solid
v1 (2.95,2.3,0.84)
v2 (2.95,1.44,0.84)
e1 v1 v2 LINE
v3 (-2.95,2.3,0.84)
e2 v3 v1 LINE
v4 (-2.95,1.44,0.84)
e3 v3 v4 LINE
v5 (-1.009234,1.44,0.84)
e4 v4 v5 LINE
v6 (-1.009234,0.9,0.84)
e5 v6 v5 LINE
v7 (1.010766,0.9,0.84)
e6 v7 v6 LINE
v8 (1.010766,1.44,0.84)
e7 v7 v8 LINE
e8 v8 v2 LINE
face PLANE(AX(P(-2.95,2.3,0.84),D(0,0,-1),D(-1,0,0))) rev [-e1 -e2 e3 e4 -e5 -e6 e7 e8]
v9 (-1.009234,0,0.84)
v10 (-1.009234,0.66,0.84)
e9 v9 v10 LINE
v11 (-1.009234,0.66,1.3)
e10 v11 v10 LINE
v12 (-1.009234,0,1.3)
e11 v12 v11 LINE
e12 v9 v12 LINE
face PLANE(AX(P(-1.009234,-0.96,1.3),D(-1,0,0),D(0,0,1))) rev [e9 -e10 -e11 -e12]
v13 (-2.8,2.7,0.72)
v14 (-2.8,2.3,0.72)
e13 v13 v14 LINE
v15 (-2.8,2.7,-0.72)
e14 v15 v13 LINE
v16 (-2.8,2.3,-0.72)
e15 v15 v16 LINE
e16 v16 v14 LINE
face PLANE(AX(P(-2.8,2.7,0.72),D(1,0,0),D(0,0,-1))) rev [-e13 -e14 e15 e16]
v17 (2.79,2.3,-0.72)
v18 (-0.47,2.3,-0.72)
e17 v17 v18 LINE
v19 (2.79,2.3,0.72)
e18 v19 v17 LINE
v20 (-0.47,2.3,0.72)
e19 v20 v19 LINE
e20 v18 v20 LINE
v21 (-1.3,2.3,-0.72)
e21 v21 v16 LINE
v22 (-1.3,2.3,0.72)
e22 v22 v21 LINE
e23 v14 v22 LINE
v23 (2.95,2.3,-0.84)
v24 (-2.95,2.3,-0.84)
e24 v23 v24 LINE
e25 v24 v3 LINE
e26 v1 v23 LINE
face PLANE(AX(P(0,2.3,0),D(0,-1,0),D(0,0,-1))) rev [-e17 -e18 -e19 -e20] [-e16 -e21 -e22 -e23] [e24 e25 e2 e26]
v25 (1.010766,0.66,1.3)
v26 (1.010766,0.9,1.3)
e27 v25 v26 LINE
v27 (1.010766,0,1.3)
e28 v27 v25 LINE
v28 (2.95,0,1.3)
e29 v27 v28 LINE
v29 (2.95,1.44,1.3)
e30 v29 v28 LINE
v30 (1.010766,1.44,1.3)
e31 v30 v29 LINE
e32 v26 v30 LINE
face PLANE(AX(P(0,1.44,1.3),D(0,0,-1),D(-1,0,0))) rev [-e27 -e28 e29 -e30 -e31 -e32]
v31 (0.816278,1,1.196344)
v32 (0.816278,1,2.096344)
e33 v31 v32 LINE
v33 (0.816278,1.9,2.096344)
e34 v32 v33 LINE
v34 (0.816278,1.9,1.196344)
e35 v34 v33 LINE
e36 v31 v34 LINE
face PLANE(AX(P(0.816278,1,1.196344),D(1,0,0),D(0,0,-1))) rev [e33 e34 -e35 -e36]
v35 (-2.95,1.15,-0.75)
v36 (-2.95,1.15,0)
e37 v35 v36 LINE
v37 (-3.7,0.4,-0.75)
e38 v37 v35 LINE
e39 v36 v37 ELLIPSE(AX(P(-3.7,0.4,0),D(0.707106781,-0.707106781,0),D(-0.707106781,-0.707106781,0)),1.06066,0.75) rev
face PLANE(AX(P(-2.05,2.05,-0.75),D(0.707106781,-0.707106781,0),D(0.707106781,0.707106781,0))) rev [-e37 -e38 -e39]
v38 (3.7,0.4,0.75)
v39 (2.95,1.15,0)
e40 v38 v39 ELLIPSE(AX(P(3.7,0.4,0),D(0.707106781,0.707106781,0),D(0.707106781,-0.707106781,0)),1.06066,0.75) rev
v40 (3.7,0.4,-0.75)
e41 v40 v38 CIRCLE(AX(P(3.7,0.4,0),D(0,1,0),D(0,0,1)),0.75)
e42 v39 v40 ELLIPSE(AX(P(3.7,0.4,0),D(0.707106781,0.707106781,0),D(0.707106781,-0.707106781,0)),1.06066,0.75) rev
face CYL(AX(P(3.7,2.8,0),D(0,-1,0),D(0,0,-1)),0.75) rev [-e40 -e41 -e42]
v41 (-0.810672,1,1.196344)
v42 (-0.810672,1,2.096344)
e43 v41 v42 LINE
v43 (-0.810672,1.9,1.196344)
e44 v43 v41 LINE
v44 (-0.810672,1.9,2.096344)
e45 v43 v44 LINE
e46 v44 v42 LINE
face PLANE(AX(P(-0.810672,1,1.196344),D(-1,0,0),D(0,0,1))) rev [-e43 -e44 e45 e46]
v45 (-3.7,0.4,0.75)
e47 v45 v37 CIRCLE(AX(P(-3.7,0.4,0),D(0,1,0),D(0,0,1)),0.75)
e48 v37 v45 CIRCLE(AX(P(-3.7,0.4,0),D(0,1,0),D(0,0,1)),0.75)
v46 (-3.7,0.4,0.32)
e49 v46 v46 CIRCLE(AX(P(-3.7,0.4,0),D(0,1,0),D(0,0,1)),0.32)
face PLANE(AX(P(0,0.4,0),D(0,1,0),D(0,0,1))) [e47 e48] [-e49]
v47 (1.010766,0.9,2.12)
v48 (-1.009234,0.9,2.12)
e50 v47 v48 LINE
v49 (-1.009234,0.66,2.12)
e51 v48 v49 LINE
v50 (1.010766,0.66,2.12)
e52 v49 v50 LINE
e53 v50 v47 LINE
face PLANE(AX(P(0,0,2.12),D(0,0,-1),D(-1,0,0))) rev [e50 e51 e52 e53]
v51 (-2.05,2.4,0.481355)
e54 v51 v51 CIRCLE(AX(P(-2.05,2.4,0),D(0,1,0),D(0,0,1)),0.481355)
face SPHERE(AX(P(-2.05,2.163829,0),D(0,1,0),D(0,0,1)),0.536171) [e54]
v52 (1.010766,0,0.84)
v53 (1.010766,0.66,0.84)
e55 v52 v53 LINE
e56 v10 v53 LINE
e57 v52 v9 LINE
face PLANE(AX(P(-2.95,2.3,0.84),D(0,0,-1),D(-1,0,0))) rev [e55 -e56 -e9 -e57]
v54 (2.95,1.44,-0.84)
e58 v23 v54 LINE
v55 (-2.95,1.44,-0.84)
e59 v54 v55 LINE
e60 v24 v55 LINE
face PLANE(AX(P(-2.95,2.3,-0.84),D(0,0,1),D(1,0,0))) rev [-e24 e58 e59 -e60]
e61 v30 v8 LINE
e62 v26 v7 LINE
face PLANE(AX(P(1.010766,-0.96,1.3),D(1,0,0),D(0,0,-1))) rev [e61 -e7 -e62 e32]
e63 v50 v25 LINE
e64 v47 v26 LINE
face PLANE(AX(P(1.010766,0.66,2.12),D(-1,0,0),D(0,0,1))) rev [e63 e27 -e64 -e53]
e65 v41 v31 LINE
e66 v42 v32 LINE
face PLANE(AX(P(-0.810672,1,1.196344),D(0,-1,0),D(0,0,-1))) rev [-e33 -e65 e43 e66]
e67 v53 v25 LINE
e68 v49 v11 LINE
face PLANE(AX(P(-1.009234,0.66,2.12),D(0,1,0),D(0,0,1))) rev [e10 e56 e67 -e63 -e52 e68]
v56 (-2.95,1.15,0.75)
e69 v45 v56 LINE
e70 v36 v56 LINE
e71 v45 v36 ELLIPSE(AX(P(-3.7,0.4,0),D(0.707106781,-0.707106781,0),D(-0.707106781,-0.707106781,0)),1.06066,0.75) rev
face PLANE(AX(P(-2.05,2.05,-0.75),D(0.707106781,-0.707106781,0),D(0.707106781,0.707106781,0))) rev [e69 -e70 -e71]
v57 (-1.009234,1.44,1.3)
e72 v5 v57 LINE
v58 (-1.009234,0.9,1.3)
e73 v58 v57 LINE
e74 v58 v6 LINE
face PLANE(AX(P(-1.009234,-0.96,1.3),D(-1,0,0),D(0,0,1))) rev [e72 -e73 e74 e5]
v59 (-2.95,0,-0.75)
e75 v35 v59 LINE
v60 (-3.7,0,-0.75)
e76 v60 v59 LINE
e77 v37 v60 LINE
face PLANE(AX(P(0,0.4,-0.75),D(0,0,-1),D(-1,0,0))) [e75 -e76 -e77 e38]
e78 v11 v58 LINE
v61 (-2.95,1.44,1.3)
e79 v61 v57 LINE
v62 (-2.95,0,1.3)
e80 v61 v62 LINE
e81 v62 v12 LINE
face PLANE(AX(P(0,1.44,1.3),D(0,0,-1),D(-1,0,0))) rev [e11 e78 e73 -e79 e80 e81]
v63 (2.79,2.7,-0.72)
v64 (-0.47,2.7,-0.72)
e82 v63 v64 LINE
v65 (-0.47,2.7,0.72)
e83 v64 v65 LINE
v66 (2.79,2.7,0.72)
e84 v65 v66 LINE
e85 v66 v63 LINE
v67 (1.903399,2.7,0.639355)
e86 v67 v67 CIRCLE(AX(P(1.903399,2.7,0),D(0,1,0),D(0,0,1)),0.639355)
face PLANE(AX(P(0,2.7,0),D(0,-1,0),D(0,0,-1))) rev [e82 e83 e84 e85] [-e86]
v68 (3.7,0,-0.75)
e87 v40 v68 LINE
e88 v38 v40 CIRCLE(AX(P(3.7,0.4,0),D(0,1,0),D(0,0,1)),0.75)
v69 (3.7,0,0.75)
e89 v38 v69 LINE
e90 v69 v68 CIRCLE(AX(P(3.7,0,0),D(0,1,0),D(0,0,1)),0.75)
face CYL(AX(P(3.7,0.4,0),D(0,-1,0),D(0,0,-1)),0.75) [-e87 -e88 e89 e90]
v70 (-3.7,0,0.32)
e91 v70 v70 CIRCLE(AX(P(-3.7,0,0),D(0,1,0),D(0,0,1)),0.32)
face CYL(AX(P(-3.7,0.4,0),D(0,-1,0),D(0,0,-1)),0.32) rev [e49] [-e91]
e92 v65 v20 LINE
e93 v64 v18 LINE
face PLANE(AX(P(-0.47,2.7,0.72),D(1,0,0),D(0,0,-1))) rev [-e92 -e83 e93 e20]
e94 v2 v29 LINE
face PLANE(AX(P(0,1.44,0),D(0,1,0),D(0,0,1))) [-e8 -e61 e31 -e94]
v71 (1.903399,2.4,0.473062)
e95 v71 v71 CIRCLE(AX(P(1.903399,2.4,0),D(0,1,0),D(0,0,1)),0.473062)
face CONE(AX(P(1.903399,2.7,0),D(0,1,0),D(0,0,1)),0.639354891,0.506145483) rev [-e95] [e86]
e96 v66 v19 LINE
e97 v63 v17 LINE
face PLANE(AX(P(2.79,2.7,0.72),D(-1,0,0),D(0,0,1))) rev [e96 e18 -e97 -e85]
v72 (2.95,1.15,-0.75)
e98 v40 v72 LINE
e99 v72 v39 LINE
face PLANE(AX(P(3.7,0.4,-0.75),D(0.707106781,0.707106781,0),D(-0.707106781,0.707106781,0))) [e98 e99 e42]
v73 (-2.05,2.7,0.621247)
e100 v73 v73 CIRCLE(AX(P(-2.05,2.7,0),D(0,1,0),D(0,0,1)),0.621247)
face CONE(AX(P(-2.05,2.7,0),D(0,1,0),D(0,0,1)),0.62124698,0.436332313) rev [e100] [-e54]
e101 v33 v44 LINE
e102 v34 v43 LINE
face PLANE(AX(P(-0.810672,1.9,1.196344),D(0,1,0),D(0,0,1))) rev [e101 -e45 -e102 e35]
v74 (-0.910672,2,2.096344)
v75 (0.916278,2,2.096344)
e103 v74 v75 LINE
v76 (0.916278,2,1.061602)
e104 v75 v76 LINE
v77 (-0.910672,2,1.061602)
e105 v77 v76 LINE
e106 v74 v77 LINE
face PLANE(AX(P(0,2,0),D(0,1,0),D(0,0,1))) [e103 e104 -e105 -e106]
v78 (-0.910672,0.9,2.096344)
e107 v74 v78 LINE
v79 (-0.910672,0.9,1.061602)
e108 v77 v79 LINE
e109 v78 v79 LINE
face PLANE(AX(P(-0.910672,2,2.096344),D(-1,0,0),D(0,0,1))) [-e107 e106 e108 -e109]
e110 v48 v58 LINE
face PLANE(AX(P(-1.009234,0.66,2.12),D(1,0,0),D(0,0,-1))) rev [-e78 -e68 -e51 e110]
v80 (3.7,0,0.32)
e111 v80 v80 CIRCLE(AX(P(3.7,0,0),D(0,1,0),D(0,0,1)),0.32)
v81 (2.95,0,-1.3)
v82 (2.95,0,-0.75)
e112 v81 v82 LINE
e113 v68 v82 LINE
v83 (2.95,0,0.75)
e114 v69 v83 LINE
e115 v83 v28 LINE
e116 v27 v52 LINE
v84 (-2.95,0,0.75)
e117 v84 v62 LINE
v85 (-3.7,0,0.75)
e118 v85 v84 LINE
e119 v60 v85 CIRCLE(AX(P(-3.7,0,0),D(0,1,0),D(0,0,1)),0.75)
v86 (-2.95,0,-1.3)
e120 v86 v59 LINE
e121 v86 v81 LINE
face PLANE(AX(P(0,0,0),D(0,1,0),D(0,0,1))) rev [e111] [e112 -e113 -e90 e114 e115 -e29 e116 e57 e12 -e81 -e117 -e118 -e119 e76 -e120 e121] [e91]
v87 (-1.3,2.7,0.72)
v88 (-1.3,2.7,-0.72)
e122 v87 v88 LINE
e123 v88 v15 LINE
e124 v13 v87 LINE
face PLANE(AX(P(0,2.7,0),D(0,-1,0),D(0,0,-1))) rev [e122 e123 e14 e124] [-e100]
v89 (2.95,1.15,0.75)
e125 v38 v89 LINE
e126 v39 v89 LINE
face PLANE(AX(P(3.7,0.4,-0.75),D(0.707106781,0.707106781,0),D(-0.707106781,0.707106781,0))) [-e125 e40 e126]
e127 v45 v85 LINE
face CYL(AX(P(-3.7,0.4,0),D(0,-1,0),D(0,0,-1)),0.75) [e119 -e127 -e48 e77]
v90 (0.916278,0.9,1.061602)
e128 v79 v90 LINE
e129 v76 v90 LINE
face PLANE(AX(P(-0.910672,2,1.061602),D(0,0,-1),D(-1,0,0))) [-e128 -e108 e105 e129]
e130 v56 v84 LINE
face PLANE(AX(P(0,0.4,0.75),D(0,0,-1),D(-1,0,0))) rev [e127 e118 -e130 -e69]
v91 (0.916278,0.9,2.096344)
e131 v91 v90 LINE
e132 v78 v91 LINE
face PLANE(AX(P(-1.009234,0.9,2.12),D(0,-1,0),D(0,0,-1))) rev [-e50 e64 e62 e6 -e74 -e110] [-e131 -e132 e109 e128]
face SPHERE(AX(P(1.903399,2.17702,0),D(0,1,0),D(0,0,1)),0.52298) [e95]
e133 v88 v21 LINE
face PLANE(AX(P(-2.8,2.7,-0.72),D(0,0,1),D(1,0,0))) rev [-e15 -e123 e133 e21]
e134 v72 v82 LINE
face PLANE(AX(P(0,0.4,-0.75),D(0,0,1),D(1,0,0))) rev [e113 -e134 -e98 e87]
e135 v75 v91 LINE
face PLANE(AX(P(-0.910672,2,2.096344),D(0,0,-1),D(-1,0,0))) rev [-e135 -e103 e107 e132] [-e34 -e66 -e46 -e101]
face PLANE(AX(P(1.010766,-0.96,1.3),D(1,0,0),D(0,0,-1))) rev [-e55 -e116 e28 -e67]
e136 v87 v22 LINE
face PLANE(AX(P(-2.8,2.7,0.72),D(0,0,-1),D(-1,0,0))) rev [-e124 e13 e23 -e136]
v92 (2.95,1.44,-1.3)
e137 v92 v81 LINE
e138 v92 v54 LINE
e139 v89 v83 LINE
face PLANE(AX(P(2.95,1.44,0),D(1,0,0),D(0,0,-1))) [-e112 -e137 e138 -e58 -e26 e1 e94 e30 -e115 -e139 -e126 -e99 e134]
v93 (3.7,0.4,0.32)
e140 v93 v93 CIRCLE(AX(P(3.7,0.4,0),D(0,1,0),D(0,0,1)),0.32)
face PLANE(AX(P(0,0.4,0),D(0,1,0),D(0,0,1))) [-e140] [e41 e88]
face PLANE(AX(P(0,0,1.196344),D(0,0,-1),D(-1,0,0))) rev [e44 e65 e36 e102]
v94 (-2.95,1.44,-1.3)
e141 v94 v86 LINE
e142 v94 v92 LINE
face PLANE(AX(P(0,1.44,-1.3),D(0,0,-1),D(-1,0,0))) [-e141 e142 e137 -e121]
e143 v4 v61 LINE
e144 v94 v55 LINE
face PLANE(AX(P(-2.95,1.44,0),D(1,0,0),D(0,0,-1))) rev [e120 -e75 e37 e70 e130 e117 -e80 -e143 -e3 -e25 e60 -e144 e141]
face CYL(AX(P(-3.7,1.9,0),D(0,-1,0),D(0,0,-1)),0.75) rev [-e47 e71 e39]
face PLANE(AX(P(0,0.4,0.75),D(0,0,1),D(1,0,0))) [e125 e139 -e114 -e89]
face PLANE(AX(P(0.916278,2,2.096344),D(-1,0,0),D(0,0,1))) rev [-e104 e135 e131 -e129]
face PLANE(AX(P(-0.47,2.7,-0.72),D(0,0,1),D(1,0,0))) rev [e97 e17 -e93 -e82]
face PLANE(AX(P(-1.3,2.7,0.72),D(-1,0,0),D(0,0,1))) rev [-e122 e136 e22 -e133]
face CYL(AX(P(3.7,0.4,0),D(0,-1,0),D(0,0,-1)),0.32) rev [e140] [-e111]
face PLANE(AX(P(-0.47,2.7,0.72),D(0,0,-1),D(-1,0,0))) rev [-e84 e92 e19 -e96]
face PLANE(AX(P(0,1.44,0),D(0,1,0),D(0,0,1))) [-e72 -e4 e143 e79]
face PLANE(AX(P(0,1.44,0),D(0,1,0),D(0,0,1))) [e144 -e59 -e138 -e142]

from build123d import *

# Parameters (mm, degrees)
BOSS_EXTRUDE1_DEPTH   = 7.2
SKETCH1_3_R           = 3.75
SKETCH1_3_R_2         = 1.6
BOSS_EXTRUDE2_DEPTH   = 2
BOSS_EXTRUDE2_2_DEPTH = 2
BOSS_EXTRUDE3_DEPTH   = 2
BOSS_EXTRUDE4_DEPTH   = 7.5
SKETCH3_R             = 3.75
CUT_EXTRUDE6_DEPTH    = 12
BOSS_EXTRUDE5_DEPTH   = 7.5
SKETCH5_R             = 3.75
CUT_EXTRUDE7_DEPTH    = 7.5
SKETCH6_W             = 29.5
SKETCH6_H             = 8.4
BOSS_EXTRUDE6_DEPTH   = 4.3
SKETCH7_W             = 7.5
SKETCH7_H             = 7.2
SKETCH7_W_2           = 16.3
BOSS_EXTRUDE7_DEPTH   = 2
SKETCH8_W             = 10.1
SKETCH8_H             = 2.3
CUT_EXTRUDE8_DEPTH    = 12
SKETCH9_W             = 10.1
SKETCH9_H             = 1.2
BOSS_EXTRUDE8_DEPTH   = 6.4
SKETCH11_W            = 9.1347476
SKETCH11_H            = 5.173710516
BOSS_EXTRUDE11_DEPTH  = 5.5
SKETCH12_R            = 3.106234899
CUT_EXTRUDE10_DEPTH   = 1.5
CUT_EXTRUDE10_DRAFT   = -25
SKETCH13_R            = 3.196774454
CUT_EXTRUDE11_DEPTH   = 1.5
CUT_EXTRUDE11_DRAFT   = -29
SKETCH14_W            = 8.1347476
SKETCH14_H            = 4.5
CUT_EXTRUDE12_DEPTH   = 4.5
SCALE1_SCALE          = 0.2


# Read off the part's stored shape, not the designer's step: Dome1, Dome2
with BuildPart() as part:
    # Sketch1 → Boss-Extrude1 (new body)
    with BuildSketch(Plane(origin=(0, 0, 0), x_dir=(1, 0, 0), z_dir=(0, 1, 0))):
        Polygon((14.75, 0), (-14.75, 0), (-14.75, -3.75), (-14.75, -6.5), (14.75, -6.5), (14.75, -3.75), align=None)
        Polygon((-14.75, 3.75), (-14.75, 0), (14.75, 0), (14.75, 3.75), (14.75, 6.5), (-14.75, 6.5), align=None)
    extrude(amount=BOSS_EXTRUDE1_DEPTH)



with BuildPart() as body_2:
    # Sketch1<3> → Boss-Extrude2 (new body)
    with BuildSketch(Plane(origin=(0, 0, 0), x_dir=(1, 0, 0), z_dir=(0, 1, 0))):
        with Locations(Location((-18.5, 0, 0), (0, 0, 270))):
            Circle(SKETCH1_3_R)
        with Locations(Location((-18.5, 0, 0), (0, 0, 270))):
            Circle(SKETCH1_3_R_2, mode=Mode.SUBTRACT)
    extrude(amount=BOSS_EXTRUDE2_DEPTH)


with BuildPart() as body_3:
    # Sketch1<3> → Boss-Extrude2 2 (new body)
    with BuildSketch(Plane(origin=(0, 0, 0), x_dir=(1, 0, 0), z_dir=(0, 1, 0))):
        with Locations(Location((18.5, 0, 0), (0, 0, 270))):
            Circle(SKETCH1_3_R)
        with Locations(Location((18.5, 0, 0), (0, 0, 270))):
            Circle(SKETCH1_3_R_2, mode=Mode.SUBTRACT)
    extrude(amount=BOSS_EXTRUDE2_2_DEPTH)


with BuildPart() as part_1:
    add(part.part)

    add(body_2.part)  # Boss-Extrude3 merges body 2

    add(body_3.part)  # Boss-Extrude3 merges body 3
    # Sketch1<4> → Boss-Extrude3 (add)
    with BuildSketch(Plane(origin=(0, 0, 0), x_dir=(1, 0, 0), z_dir=(0, 1, 0))):
        with BuildLine():
            Line((-14.75, -3.75), (-14.75, 0))
            ThreePointArc((-14.75, 0), (-15.848349571, -2.651650429), (-18.5, -3.75))
            Line((-18.5, -3.75), (-14.75, -3.75))
        make_face()
        with BuildLine():
            Line((-14.75, 0), (-14.75, 3.75))
            Line((-14.75, 3.75), (-18.5, 3.75))
            ThreePointArc((-18.5, 3.75), (-15.848349571, 2.651650429), (-14.75, 0))
        make_face()
        with BuildLine():
            Line((18.5, 3.75), (14.75, 3.75))
            Line((14.75, 3.75), (14.75, 0))
            ThreePointArc((14.75, 0), (15.848349571, 2.651650429), (18.5, 3.75))
        make_face()
        with BuildLine():
            ThreePointArc((18.5, -3.75), (15.848349571, -2.651650429), (14.75, 0))
            Line((14.75, 0), (14.75, -3.75))
            Line((14.75, -3.75), (18.5, -3.75))
        make_face()
    extrude(amount=BOSS_EXTRUDE3_DEPTH)

    # Sketch2 → Boss-Extrude4 (add)
    with BuildSketch(Plane.XY.offset(3.75)):
        Polygon((18.5, 2), (14.75, 2), (14.75, 5.75), align=None)
    extrude(amount=-BOSS_EXTRUDE4_DEPTH)

    # Sketch3 → Cut-Extrude6 (cut)
    with BuildSketch(Plane(origin=(0, 2, 0), x_dir=(1, 0, 0), z_dir=(0, 1, 0))):
        with Locations((18.5, 0)):
            Circle(SKETCH3_R)
    extrude(amount=CUT_EXTRUDE6_DEPTH, mode=Mode.SUBTRACT)

    # Sketch4 → Boss-Extrude5 (add)
    with BuildSketch(Plane.XY.offset(3.75)):
        Polygon((-14.75, 5.75), (-18.5, 2), (-14.75, 2), align=None)
    extrude(amount=-BOSS_EXTRUDE5_DEPTH)

    # Sketch5 → Cut-Extrude7 (cut)
    with BuildSketch(Plane(origin=(0, 2, 0), x_dir=(1, 0, 0), z_dir=(0, 1, 0))):
        with Locations((-18.5, 0)):
            Circle(SKETCH5_R)
    extrude(amount=CUT_EXTRUDE7_DEPTH, mode=Mode.SUBTRACT)

    # Sketch6 → Boss-Extrude6 (add)
    with BuildSketch(Plane(origin=(0, 7.2, 0), x_dir=(1, 0, 0), z_dir=(0, 1, 0))):
        Rectangle(SKETCH6_W, SKETCH6_H)
    extrude(amount=BOSS_EXTRUDE6_DEPTH)

    # Sketch7 → Boss-Extrude7 (add)
    with BuildSketch(Plane(origin=(0, 11.5, 0), x_dir=(1, 0, 0), z_dir=(0, 1, 0))):
        with Locations((-10.25, 0)):
            Rectangle(SKETCH7_W, SKETCH7_H)
        with Locations((5.8, 0)):
            Rectangle(SKETCH7_W_2, SKETCH7_H)
    extrude(amount=BOSS_EXTRUDE7_DEPTH)

    # Sketch8 → Cut-Extrude8 (cut)
    with BuildSketch(Plane(origin=(0, 7.2, 0), x_dir=(1, 0, 0), z_dir=(0, 1, 0))):
        with Locations((0.003829246, -5.35)):
            Rectangle(SKETCH8_W, SKETCH8_H)
    extrude(amount=-CUT_EXTRUDE8_DEPTH, mode=Mode.SUBTRACT)

    # Sketch9 → Boss-Extrude8 (add)
    with BuildSketch(Plane.XY.offset(4.2)):
        with Locations((0.003829246, 3.9)):
            Rectangle(SKETCH9_W, SKETCH9_H)
    extrude(amount=BOSS_EXTRUDE8_DEPTH)

    # Sketch11 → Boss-Extrude11 (add)
    with BuildSketch(Plane(origin=(0, 4.5, 0), x_dir=(1, 0, 0), z_dir=(0, 1, 0))):
        with Locations((0.014014126, -7.894862881)):
            Rectangle(SKETCH11_W, SKETCH11_H)
    extrude(amount=BOSS_EXTRUDE11_DEPTH)


with BuildPart() as cut_extrude10_tool:
    # Sketch12 → Cut-Extrude10 (with draft: the straight prism first)
    with BuildSketch(Plane(origin=(0, 13.5, 0), x_dir=(1, 0, 0), z_dir=(0, 1, 0))):
        with Locations((-10.25, 0)):
            Circle(SKETCH12_R)
    extrude(amount=-CUT_EXTRUDE10_DEPTH)
    # Cut-Extrude10: the draft: its side faces are tilted about the plane it starts from
    cut_extrude10_sides = [cut_extrude10_tool.faces().sort_by_distance(p)[0] for p in [
        (-13.356234899, 12.75, 0),
    ]]
    draft(cut_extrude10_sides, Plane(origin=(0, 13.5, 0), x_dir=(1, 0, 0), z_dir=(0, 1, 0)), CUT_EXTRUDE10_DRAFT)


with BuildPart() as part_2:
    add(part_1.part)

    # Cut-Extrude10: cut by cut_extrude10_tool
    add(cut_extrude10_tool.part, mode=Mode.SUBTRACT)


with BuildPart() as cut_extrude11_tool:
    # Sketch13 → Cut-Extrude11 (with draft: the straight prism first)
    with BuildSketch(Plane(origin=(0, 13.5, 0), x_dir=(1, 0, 0), z_dir=(0, 1, 0))):
        with Locations((9.516994158, 0)):
            Circle(SKETCH13_R)
    extrude(amount=-CUT_EXTRUDE11_DEPTH)
    # Cut-Extrude11: the draft: its side faces are tilted about the plane it starts from
    cut_extrude11_sides = [cut_extrude11_tool.faces().sort_by_distance(p)[0] for p in [
        (6.320219704, 12.75, 0),
    ]]
    draft(cut_extrude11_sides, Plane(origin=(0, 13.5, 0), x_dir=(1, 0, 0), z_dir=(0, 1, 0)), CUT_EXTRUDE11_DRAFT)


with BuildPart() as part_3:
    add(part_2.part)

    # Cut-Extrude11: cut by cut_extrude11_tool
    add(cut_extrude11_tool.part, mode=Mode.SUBTRACT)

    # Dome1 outline → Dome1 (revolve)
    with BuildSketch(Plane(origin=(-10.25, 0, 0), x_dir=(1, 0, 0), z_dir=(0, 0, 1))):
        with BuildLine():
            Line((0, 12), (2.406773413, 11.999999998))
            ThreePointArc((2.406773413, 11.999999998), (1.417970228, 13.094302608), (0, 13.5))
            Line((0, 13.5), (0, 12))
        make_face()
    revolve(axis=Axis((-10.25, 0, 0), (0, 1, 0)))

    # Dome2 outline → Dome2 (revolve)
    with BuildSketch(Plane(origin=(9.516994158, 0, 0), x_dir=(1, 0, 0), z_dir=(0, 0, 1))):
        with BuildLine():
            Line((0, 12), (2.365310878, 11.999999998))
            ThreePointArc((2.365310878, 11.999999998), (1.400419183, 13.093385967), (0, 13.5))
            Line((0, 13.5), (0, 12))
        make_face()
    revolve(axis=Axis((9.516994158, 0, 0), (0, 1, 0)))

    # Sketch14 → Cut-Extrude12 (cut)
    with BuildSketch(Plane.XY.offset(10.481718139)):
        with Locations((0.014014126, 7.25)):
            Rectangle(SKETCH14_W, SKETCH14_H)
    extrude(amount=-CUT_EXTRUDE12_DEPTH, mode=Mode.SUBTRACT)


with BuildPart() as part_4:
    # Scale1: scaled about (0, 0, 0)
    add(part_3.part.scale(SCALE1_SCALE))


solid = part_4.part
